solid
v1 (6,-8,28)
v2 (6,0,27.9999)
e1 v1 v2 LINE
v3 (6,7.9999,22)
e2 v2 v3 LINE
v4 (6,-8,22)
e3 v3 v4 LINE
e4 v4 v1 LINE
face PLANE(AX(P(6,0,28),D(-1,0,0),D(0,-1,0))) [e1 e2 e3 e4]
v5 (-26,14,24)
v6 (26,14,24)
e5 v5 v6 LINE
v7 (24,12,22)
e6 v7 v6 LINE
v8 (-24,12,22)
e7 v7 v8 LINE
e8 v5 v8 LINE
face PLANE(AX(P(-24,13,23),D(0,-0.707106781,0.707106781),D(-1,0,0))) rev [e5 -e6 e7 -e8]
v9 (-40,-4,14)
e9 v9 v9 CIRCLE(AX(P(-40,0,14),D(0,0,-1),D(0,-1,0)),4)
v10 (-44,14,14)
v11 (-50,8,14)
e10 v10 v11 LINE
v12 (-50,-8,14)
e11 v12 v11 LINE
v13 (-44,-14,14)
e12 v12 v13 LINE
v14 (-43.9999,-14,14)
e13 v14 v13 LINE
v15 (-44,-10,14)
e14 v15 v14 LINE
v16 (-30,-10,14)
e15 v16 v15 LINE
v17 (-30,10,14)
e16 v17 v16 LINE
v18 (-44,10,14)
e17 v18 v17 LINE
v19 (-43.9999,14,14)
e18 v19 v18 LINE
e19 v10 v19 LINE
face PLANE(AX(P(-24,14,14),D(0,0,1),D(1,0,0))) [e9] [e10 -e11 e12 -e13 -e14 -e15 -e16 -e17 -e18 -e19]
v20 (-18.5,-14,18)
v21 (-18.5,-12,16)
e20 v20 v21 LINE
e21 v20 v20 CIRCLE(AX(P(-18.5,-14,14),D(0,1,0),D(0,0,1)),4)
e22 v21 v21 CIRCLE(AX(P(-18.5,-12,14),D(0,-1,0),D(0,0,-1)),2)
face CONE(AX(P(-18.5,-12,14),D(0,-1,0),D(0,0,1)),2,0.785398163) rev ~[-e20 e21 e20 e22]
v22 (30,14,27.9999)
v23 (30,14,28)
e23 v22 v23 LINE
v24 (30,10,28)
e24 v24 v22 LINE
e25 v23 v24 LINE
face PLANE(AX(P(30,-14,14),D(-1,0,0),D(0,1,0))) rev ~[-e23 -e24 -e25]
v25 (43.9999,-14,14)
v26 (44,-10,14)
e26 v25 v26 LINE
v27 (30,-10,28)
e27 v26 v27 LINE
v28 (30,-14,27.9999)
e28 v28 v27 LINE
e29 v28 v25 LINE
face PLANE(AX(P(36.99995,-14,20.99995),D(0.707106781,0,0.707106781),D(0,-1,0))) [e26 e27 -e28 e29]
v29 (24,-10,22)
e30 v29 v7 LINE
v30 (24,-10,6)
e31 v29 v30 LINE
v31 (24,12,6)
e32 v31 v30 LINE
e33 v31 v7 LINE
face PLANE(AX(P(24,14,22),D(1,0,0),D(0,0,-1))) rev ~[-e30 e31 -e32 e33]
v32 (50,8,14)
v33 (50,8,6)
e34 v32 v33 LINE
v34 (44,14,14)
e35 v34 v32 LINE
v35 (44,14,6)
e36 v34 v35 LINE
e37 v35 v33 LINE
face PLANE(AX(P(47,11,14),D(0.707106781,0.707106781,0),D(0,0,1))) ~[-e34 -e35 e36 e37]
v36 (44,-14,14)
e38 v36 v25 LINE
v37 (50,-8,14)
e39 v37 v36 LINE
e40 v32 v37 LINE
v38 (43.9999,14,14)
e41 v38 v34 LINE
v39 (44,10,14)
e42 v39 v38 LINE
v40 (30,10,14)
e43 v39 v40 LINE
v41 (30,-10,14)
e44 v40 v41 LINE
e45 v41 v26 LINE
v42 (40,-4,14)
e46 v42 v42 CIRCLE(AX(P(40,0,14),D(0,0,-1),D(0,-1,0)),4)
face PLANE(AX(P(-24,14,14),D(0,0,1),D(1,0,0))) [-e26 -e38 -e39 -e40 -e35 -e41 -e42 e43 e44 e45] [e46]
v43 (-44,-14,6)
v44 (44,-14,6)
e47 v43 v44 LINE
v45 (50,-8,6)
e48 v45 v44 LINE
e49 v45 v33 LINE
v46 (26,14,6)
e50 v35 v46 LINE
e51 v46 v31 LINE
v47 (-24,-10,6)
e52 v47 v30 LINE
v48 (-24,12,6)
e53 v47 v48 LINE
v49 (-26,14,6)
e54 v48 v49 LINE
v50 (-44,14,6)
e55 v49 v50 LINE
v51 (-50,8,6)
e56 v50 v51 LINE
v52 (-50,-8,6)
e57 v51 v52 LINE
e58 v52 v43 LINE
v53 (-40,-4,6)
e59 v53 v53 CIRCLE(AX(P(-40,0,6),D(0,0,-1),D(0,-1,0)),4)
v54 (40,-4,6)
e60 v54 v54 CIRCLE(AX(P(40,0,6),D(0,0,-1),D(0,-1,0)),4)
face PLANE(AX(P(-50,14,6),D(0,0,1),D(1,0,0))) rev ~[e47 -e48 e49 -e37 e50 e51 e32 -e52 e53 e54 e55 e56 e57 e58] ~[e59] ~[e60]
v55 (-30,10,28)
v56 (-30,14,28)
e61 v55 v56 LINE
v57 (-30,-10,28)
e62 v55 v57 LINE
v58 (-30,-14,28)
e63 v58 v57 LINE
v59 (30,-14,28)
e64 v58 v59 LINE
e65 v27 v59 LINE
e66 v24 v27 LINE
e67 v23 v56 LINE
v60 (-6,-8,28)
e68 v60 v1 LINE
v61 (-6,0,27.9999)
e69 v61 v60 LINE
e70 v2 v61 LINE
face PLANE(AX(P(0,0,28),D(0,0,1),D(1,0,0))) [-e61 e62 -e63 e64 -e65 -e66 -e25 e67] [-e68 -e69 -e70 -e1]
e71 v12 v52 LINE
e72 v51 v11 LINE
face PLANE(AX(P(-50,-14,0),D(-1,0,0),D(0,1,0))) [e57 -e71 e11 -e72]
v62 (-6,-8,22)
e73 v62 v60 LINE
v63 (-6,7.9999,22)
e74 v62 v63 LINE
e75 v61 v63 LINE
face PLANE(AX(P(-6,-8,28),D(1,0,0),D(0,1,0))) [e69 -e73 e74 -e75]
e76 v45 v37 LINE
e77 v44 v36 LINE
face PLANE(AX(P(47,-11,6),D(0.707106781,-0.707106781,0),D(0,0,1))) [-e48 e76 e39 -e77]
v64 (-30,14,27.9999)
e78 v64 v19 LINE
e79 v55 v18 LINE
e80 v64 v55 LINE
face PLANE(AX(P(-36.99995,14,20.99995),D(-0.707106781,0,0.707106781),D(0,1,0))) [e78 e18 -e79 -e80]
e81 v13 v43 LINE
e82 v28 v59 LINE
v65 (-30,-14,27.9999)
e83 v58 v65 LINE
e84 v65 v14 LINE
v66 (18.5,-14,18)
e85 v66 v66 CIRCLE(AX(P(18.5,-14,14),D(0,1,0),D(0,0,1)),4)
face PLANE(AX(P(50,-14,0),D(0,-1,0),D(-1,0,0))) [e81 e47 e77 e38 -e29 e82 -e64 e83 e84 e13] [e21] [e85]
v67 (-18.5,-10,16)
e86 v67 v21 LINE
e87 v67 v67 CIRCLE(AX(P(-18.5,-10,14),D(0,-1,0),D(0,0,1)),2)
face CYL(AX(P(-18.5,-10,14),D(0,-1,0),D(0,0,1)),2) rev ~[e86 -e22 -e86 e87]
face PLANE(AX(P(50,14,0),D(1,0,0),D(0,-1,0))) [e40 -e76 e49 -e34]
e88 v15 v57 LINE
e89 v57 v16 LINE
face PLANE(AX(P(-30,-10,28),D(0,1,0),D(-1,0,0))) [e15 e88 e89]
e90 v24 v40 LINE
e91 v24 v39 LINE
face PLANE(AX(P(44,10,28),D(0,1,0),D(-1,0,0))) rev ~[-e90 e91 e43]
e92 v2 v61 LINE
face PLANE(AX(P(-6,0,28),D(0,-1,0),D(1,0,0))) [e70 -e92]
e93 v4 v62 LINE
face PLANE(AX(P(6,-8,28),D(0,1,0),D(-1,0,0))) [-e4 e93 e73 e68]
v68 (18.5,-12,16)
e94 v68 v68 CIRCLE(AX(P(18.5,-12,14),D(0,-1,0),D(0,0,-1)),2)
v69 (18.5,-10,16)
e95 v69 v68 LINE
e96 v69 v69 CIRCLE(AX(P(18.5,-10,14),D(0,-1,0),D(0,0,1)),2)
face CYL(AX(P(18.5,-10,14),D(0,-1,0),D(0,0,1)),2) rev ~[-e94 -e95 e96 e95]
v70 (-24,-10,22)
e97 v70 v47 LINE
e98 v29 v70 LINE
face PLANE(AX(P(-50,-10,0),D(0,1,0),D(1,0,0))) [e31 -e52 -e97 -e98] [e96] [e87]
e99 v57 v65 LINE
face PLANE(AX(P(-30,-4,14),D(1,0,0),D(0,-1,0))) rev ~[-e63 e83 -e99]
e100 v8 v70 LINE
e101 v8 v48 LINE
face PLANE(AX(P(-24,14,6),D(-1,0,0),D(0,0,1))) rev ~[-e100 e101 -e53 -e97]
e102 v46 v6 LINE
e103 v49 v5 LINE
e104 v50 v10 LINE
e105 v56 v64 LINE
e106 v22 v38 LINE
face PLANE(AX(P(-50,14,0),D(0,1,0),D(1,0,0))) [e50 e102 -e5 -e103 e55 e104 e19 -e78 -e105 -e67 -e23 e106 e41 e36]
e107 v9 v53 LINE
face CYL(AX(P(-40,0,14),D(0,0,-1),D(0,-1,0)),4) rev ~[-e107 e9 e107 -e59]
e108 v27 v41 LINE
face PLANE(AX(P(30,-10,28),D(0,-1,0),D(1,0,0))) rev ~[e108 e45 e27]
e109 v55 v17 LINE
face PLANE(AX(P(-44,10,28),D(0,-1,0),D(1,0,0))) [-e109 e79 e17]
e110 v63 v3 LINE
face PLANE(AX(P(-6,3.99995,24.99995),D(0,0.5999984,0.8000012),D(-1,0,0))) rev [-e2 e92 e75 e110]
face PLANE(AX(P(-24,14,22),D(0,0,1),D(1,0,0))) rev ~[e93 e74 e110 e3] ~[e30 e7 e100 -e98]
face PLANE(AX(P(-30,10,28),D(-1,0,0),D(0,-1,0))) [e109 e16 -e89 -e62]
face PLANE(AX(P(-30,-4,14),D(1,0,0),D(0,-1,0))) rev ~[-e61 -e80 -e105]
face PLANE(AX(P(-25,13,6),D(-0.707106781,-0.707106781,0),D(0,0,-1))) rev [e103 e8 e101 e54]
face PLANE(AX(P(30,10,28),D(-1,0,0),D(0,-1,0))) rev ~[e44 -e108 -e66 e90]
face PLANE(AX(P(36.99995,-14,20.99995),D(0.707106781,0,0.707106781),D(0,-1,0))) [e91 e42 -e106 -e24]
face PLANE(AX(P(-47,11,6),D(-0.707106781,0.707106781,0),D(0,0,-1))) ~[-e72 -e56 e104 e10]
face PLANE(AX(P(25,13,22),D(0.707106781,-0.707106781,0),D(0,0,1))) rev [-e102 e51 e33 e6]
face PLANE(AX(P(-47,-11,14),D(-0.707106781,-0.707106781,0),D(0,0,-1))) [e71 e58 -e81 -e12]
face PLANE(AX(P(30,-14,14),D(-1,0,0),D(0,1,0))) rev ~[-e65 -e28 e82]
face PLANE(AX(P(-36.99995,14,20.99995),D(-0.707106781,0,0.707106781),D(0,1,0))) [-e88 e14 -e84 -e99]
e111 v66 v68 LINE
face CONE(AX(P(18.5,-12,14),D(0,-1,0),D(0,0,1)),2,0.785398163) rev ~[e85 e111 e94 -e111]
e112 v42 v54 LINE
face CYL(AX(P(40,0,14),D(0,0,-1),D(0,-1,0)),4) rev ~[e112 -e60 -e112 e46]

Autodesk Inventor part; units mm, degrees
ref_plane "YZ Plane" through (0, 0, 0) normal (1, 0, 0) x (0, 1, 0)
ref_plane "XZ Plane" through (0, 0, 0) normal (0, 1, 0) x (-1, 0, 0)
sketch "Esquisse1" plane through (0, 0, 0) normal (0, 0, 1) x (1, 0, 0)
  line L0 (-50, 14) -> (50, 14)
  line L1 (50, 14) -> (50, -14)
  line L2 (50, -14) -> (-50, -14)
  line L3 (-50, -14) -> (-50, 14)
  point P0 (0, 0)
  dimension "d0" = 100
  dimension "d1" = 28
  dimension "d2" = 14
  dimension "d3" = 50
extrude "Extrusion1" add sketch "Esquisse1" along normal blind 28
sketch "Esquisse2" plane through (-50, 14, 0) normal (0, 1, 0) x (1, 0, 0)
  line L0 (26, -22) -> (74, -22)
  line L1 (74, -22) -> (74, -6)
  line L2 (74, -6) -> (26, -6)
  line L3 (26, -6) -> (26, -22)
  line L4 (0, 0) -> (100, 0) projected
  line L5 (0, 0) -> (0, -28) projected
  line L6 (100, -28) -> (0, -28) projected
  line L7 (100, 0) -> (100, -28) projected
  point P0 (50, 0)
  dimension "d6" = 26
  dimension "d7" = 48
  dimension "d8" = 26
  dimension "d9" = 6
  dimension "d10" = 6
  dimension "d11" = 16
extrude "Extrusion2" cut sketch "Esquisse2" against normal blind 24 contours L3 L2 L1 L0
ref_plane "Plan de construction1" through (-24, 14, 14) normal (0, 0, 1) x (1, 0, 0)
sketch "Esquisse3" plane through (-24, 14, 14) normal (0, 0, 1) x (1, 0, 0)
  line L0 (110.7171, 2) -> (-26, 2)
  line L1 (70, 2) -> (54, -18)
  line L2 (-6, -18) -> (-26, 2)
  line L3 (-26, 2) -> (-81.3521, 2)
  line L4 (74, -28) -> (-26, -28) projected
  line L5 (110.7171, 2) -> (110.7171, -53.3012)
  line L6 (110.7171, -53.3012) -> (-81.3521, -53.3012)
  line L7 (-81.3521, -53.3012) -> (-81.3521, 2)
  line L8 (-6, 2) -> (-6, -28)
  line L9 (-26, -28) -> (74, -28) projected
  line L10 (-6, -28) -> (54, -28)
  line L11 (54, -53.3012) -> (54, 2)
  point P0 (24, -14)
  point P1 (54.2399, -28)
  point P2 (-6.2399, -28)
  dimension "d25" = 60
  dimension "d26" = 30
  dimension "d27" = 30
extrude "Extrusion3" cut sketch "Esquisse3" along normal blind 14 and the other way blind 3 contours L5 L6 L11 L1 L0 | L1 L11 L0 | L6 L7 L3 L2 L8 L4 L11 | L8 L2 L0
sketch "Esquisse7" plane through (-50, -10, 0) normal (0, 1, 0) x (1, 0, 0)
  line L0 (68.5, -14) -> (31.5, -14)
  line L1 (74, -6) -> (74, -22) projected
  line L2 (26, -6) -> (74, -6) projected
  point P0 (50, 0)
  dimension "d61" = 37
  dimension "d62" = 5.5
  dimension "d63" = 8
hole "Perçage2" at (18.5, -10, 14) at (-18.5, -10, 14) direction (0, -1, 0) diameter 4 end through all
chamfer "Chanfrein1" distance 2 angle 45 6 edges at (-18.5, -14, 12) (18.5, -14, 12) (24, 14, 14) (0, 14, 22) (-24, 14, 14) (0, 14, 6)
sketch "Esquisse8" plane through (0, 0, 28) normal (0, 0, 1) x (1, 0, 0)
  line L0 (6, -8) -> (-6, -8)
  line L1 (-6, -8) -> (-6, 0)
  line L2 (-6, 0) -> (6, 0)
  line L3 (6, 0) -> (6, -8)
  line L4 (-30, -14) -> (30, -14) projected
  point P0 (0, 0)
  point P1 (-28, -14)
  point P2 (28, -14)
  dimension "d74" = 12
  dimension "d75" = 8
  dimension "d76" = 6
  dimension "d77" = 6
extrude "Extrusion6" cut sketch "Esquisse8" against normal blind 6
chamfer "Chanfrein2" distance 8 distance2 6 1 edges at (0, 0, 22) measured on face at (2, 8, 22)
sketch "Esquisse10" plane through (-50, 14, 11) normal (0, 1, 0) x (1, 0, 0)
  line L0 (26, 5) -> (74, 5) projected
  line L1 (0, 11) -> (0, 0) projected
  line L2 (100, 11) -> (100, 0) projected
  line L3 (108, 0) -> (100, 0) projected
  line L4 (100, 0) -> (100, 29.3143)
  line L5 (100, 29.3143) -> (0, 29.3143)
  line L6 (0, 4) -> (0, 0) projected
  line L7 (0, 29.3143) -> (0, 0)
  line L8 (0, 5) -> (100, 5)
  point P0 (50, 11)
  point P1 (104, 4)
  point P2 (0, -10)
  point P3 (83.4286, 5)
extrude "Extrusion8" cut sketch "Esquisse10" against normal through all
move faces "Déplacer2" translate (0, 0, 3) faces at (36.6667, 4.6667, 11) (-43.3333, 4.6667, 11)
chamfer "Chanfrein3" distance 14 angle 45 2 edges at (30, 0, 14) (-30, 0, 14)
sketch "Esquisse11" plane through (0, 0, 28) normal (0, 0, 1) x (1, 0, 0)
  line L0 (30, -10) -> (44, -10)
  line L1 (44, -10) -> (44, 10)
  line L2 (44, 10) -> (30, 10)
  line L3 (30, 10) -> (30, -10)
  line L4 (0, 23.1019) -> (0, 45.1351)
  line L5 (30, -14) -> (30, 14) projected
  line L6 (44, -14) -> (44, 14) projected
  line L7 (30, -14) -> (44, -14) projected
  line L8 (44, 14) -> (30, 14) projected
  line L9 (-30, -10) -> (-44, -10)
  line L10 (-44, -10) -> (-44, 10)
  line L11 (-44, 10) -> (-30, 10)
  line L12 (-30, 10) -> (-30, -10)
  line L13 (-30, -14) -> (-30, 14)
  line L14 (-44, -14) -> (-44, 14)
  line L15 (-30, -14) -> (-44, -14)
  line L16 (-44, 14) -> (-30, 14)
  point P0 (0, 0)
  dimension "d100" = 4
  dimension "d101" = 4
extrude "Extrusion9" cut sketch "Esquisse11" against normal blind 14 contours L3 L2 L1 L0 | L9 L10 L11 L12
chamfer "Chanfrein4" distance 6 angle 45 4 edges at (50, 14, 10) (50, -14, 10) (-50, 14, 10) (-50, -14, 10)
sketch "Esquisse12" plane through (30, 10, 14) normal (0, 0, 1) x (1, 0, 0)
  line L0 (10, -10) -> (-70, -10)
  line L1 (20, -2) -> (20, -18) projected
  line L2 (-80, -18) -> (-80, -2) projected
  point P0 (-30, -10)
  dimension "d107" = 10
  dimension "d108" = 10
hole "Perçage3" at (40, 0, 14) at (-40, 0, 14) direction (0, 0, -1) diameter 8 end through all
properties part number "Support_GP2"
